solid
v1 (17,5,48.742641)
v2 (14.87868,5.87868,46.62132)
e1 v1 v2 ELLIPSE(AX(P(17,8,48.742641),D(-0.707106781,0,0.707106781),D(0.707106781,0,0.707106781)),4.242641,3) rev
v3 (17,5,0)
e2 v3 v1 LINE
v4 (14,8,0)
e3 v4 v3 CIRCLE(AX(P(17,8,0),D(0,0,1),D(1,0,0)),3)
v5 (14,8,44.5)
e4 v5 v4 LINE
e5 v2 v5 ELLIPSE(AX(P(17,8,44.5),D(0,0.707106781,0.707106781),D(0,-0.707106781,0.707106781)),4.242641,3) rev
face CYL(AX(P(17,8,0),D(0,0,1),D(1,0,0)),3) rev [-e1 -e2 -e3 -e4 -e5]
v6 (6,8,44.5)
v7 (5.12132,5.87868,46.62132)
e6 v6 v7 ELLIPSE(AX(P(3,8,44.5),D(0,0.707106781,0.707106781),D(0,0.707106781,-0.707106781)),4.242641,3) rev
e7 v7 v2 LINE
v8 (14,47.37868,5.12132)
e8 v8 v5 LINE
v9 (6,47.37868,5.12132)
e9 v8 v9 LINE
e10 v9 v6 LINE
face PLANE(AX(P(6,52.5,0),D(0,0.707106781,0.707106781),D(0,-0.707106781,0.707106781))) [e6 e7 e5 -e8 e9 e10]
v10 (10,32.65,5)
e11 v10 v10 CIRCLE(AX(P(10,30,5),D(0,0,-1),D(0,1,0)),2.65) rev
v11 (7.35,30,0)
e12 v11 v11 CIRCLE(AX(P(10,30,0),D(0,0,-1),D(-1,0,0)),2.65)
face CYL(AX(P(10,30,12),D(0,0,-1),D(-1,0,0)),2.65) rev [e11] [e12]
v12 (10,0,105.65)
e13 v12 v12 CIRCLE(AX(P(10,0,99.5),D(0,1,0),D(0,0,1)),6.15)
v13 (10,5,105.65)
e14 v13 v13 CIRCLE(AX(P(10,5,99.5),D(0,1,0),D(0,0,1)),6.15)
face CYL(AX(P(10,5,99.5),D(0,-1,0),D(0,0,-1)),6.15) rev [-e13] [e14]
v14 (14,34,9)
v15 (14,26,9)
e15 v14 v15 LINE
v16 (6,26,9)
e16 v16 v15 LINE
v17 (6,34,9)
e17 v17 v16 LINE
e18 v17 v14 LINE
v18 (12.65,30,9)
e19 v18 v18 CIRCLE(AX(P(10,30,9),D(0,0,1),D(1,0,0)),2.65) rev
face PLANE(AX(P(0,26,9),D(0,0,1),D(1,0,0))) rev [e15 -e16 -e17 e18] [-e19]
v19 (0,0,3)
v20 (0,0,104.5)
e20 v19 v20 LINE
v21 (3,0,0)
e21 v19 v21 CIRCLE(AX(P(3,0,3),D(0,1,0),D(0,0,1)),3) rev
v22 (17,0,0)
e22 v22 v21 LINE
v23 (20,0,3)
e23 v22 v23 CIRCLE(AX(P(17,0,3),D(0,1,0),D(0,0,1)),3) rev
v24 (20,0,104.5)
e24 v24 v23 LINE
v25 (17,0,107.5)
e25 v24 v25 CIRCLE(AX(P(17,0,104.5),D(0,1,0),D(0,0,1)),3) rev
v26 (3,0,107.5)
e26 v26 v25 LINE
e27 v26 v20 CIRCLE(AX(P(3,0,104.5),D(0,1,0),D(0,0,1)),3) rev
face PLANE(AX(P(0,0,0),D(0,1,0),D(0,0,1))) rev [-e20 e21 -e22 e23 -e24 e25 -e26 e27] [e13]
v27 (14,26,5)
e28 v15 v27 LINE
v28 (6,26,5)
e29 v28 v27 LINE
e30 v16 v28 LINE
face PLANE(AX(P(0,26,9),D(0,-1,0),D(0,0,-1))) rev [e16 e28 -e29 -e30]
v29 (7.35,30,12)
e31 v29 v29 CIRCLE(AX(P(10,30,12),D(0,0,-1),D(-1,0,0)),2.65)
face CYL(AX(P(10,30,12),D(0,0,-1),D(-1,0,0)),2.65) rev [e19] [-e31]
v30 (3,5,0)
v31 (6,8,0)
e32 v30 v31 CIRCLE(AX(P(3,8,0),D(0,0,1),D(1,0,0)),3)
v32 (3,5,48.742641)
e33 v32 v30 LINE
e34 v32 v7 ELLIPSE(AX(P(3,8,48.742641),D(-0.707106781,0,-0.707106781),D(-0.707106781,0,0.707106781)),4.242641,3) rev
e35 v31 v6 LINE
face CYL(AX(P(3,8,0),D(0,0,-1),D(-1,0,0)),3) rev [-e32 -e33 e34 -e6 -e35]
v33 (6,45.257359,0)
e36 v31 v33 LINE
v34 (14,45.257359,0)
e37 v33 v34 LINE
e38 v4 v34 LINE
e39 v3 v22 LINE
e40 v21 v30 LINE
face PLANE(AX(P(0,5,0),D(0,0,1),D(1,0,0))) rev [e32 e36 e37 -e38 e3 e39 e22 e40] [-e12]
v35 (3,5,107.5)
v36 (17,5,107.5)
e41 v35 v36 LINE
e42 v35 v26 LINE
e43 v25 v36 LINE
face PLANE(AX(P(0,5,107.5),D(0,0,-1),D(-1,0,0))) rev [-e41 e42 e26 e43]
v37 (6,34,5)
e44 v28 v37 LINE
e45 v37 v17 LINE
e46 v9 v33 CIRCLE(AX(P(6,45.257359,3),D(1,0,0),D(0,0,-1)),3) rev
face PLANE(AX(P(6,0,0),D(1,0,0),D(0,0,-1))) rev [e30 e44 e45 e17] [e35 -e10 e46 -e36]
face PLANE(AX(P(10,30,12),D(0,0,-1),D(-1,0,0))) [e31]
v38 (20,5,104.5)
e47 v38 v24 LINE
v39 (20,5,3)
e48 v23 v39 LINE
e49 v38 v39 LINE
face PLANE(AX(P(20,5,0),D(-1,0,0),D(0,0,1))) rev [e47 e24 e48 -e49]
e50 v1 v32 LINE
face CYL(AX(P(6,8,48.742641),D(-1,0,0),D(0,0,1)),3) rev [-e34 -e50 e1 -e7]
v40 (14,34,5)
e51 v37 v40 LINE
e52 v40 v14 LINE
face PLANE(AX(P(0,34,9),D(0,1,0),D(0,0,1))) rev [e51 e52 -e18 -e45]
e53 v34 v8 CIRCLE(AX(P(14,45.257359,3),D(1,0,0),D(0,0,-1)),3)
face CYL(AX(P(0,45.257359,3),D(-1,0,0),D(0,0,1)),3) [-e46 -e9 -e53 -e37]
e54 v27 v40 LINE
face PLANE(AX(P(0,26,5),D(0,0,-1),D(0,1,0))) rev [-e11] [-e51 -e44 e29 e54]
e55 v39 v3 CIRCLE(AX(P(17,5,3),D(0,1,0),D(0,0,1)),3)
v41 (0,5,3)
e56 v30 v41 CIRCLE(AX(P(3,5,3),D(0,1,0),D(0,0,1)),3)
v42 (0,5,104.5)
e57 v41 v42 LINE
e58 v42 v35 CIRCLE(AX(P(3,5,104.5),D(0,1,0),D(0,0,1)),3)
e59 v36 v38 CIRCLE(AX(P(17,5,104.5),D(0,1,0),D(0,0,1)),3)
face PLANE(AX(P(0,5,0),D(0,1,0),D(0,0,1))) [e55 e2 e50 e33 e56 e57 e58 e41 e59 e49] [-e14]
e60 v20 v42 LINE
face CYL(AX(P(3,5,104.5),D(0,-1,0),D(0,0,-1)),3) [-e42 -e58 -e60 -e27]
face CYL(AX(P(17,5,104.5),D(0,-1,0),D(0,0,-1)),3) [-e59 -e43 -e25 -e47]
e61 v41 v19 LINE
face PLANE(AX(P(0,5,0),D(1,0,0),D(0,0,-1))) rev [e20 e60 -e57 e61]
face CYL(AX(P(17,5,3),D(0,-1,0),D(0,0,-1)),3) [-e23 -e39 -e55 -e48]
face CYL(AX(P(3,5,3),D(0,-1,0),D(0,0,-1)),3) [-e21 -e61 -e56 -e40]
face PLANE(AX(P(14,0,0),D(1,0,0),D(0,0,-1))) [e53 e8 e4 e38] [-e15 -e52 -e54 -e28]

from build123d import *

# Parameters (mm, degrees)
SKETCH3_W                = 20
SKETCH3_H                = 107.5
SKETCH3_R                = 6.15
BOSS_EXTRUDE2_DEPTH      = 5
BOSS_EXTRUDE3_DEPTH      = 4
BOSS_EXTRUDE3_DEPTH_BACK = 4
SKETCH5_R                = 2.65
CUT_EXTRUDE1_DEPTH       = 12
SKETCH6_W                = 4
SKETCH6_H                = 8
CUT_EXTRUDE2_DEPTH       = 121.451234946
FILLET1_R                = 3


with BuildPart() as part:
    # Sketch3 → Boss-Extrude2 (new body)
    with BuildSketch(Plane(origin=(0, 0, 0), x_dir=(1, 0, 0), z_dir=(0, 1, 0))):
        with Locations((10, -53.75)):
            Rectangle(SKETCH3_W, SKETCH3_H)
        with Locations(Location((10, -99.5, 0), (0, 0, 270))):
            Circle(SKETCH3_R, mode=Mode.SUBTRACT)
    extrude(amount=BOSS_EXTRUDE2_DEPTH)

    # Sketch4 → Boss-Extrude3 (add, two sides: drawn at the far end of the back side and taken through both)
    with BuildSketch(Plane(origin=(10, 0, 0), x_dir=(0, 0, -1), z_dir=(1, 0, 0)).offset(-BOSS_EXTRUDE3_DEPTH_BACK)):
        Polygon((0, 5), (0, 52.5), (-47.5, 5), align=None)
    extrude(amount=BOSS_EXTRUDE3_DEPTH + BOSS_EXTRUDE3_DEPTH_BACK)

    # Sketch5 → Cut-Extrude1 (cut)
    with BuildSketch(Plane(origin=(0, 0, 0), x_dir=(-1, 0, 0), z_dir=(0, 0, -1))):
        with Locations((-10, 30)):
            Circle(SKETCH5_R)
    extrude(amount=-CUT_EXTRUDE1_DEPTH, mode=Mode.SUBTRACT)

    # Sketch6 → Cut-Extrude2 (cut, through all)
    with BuildSketch(Plane(origin=(14, 0, 0), x_dir=(0, 0, -1), z_dir=(1, 0, 0))):
        with Locations((-7, 30)):
            Rectangle(SKETCH6_W, SKETCH6_H)
    extrude(amount=-CUT_EXTRUDE2_DEPTH, mode=Mode.SUBTRACT)

    # Fillet1
    fillet1_edges = [part.edges().sort_by_distance(p)[0] for p in [
        (20, 2.5, 107.5),
        (0, 2.5, 107.5),
        (6, 5, 23.75),
        (10, 5, 47.5),
        (14, 5, 23.75),
        (10, 52.5, 0),
        (20, 2.5, 0),
        (0, 2.5, 0),
    ]]
    fillet(fillet1_edges, radius=FILLET1_R - 0.0001)  # a hair under: the kernel refuses the full size


solid = part.part
